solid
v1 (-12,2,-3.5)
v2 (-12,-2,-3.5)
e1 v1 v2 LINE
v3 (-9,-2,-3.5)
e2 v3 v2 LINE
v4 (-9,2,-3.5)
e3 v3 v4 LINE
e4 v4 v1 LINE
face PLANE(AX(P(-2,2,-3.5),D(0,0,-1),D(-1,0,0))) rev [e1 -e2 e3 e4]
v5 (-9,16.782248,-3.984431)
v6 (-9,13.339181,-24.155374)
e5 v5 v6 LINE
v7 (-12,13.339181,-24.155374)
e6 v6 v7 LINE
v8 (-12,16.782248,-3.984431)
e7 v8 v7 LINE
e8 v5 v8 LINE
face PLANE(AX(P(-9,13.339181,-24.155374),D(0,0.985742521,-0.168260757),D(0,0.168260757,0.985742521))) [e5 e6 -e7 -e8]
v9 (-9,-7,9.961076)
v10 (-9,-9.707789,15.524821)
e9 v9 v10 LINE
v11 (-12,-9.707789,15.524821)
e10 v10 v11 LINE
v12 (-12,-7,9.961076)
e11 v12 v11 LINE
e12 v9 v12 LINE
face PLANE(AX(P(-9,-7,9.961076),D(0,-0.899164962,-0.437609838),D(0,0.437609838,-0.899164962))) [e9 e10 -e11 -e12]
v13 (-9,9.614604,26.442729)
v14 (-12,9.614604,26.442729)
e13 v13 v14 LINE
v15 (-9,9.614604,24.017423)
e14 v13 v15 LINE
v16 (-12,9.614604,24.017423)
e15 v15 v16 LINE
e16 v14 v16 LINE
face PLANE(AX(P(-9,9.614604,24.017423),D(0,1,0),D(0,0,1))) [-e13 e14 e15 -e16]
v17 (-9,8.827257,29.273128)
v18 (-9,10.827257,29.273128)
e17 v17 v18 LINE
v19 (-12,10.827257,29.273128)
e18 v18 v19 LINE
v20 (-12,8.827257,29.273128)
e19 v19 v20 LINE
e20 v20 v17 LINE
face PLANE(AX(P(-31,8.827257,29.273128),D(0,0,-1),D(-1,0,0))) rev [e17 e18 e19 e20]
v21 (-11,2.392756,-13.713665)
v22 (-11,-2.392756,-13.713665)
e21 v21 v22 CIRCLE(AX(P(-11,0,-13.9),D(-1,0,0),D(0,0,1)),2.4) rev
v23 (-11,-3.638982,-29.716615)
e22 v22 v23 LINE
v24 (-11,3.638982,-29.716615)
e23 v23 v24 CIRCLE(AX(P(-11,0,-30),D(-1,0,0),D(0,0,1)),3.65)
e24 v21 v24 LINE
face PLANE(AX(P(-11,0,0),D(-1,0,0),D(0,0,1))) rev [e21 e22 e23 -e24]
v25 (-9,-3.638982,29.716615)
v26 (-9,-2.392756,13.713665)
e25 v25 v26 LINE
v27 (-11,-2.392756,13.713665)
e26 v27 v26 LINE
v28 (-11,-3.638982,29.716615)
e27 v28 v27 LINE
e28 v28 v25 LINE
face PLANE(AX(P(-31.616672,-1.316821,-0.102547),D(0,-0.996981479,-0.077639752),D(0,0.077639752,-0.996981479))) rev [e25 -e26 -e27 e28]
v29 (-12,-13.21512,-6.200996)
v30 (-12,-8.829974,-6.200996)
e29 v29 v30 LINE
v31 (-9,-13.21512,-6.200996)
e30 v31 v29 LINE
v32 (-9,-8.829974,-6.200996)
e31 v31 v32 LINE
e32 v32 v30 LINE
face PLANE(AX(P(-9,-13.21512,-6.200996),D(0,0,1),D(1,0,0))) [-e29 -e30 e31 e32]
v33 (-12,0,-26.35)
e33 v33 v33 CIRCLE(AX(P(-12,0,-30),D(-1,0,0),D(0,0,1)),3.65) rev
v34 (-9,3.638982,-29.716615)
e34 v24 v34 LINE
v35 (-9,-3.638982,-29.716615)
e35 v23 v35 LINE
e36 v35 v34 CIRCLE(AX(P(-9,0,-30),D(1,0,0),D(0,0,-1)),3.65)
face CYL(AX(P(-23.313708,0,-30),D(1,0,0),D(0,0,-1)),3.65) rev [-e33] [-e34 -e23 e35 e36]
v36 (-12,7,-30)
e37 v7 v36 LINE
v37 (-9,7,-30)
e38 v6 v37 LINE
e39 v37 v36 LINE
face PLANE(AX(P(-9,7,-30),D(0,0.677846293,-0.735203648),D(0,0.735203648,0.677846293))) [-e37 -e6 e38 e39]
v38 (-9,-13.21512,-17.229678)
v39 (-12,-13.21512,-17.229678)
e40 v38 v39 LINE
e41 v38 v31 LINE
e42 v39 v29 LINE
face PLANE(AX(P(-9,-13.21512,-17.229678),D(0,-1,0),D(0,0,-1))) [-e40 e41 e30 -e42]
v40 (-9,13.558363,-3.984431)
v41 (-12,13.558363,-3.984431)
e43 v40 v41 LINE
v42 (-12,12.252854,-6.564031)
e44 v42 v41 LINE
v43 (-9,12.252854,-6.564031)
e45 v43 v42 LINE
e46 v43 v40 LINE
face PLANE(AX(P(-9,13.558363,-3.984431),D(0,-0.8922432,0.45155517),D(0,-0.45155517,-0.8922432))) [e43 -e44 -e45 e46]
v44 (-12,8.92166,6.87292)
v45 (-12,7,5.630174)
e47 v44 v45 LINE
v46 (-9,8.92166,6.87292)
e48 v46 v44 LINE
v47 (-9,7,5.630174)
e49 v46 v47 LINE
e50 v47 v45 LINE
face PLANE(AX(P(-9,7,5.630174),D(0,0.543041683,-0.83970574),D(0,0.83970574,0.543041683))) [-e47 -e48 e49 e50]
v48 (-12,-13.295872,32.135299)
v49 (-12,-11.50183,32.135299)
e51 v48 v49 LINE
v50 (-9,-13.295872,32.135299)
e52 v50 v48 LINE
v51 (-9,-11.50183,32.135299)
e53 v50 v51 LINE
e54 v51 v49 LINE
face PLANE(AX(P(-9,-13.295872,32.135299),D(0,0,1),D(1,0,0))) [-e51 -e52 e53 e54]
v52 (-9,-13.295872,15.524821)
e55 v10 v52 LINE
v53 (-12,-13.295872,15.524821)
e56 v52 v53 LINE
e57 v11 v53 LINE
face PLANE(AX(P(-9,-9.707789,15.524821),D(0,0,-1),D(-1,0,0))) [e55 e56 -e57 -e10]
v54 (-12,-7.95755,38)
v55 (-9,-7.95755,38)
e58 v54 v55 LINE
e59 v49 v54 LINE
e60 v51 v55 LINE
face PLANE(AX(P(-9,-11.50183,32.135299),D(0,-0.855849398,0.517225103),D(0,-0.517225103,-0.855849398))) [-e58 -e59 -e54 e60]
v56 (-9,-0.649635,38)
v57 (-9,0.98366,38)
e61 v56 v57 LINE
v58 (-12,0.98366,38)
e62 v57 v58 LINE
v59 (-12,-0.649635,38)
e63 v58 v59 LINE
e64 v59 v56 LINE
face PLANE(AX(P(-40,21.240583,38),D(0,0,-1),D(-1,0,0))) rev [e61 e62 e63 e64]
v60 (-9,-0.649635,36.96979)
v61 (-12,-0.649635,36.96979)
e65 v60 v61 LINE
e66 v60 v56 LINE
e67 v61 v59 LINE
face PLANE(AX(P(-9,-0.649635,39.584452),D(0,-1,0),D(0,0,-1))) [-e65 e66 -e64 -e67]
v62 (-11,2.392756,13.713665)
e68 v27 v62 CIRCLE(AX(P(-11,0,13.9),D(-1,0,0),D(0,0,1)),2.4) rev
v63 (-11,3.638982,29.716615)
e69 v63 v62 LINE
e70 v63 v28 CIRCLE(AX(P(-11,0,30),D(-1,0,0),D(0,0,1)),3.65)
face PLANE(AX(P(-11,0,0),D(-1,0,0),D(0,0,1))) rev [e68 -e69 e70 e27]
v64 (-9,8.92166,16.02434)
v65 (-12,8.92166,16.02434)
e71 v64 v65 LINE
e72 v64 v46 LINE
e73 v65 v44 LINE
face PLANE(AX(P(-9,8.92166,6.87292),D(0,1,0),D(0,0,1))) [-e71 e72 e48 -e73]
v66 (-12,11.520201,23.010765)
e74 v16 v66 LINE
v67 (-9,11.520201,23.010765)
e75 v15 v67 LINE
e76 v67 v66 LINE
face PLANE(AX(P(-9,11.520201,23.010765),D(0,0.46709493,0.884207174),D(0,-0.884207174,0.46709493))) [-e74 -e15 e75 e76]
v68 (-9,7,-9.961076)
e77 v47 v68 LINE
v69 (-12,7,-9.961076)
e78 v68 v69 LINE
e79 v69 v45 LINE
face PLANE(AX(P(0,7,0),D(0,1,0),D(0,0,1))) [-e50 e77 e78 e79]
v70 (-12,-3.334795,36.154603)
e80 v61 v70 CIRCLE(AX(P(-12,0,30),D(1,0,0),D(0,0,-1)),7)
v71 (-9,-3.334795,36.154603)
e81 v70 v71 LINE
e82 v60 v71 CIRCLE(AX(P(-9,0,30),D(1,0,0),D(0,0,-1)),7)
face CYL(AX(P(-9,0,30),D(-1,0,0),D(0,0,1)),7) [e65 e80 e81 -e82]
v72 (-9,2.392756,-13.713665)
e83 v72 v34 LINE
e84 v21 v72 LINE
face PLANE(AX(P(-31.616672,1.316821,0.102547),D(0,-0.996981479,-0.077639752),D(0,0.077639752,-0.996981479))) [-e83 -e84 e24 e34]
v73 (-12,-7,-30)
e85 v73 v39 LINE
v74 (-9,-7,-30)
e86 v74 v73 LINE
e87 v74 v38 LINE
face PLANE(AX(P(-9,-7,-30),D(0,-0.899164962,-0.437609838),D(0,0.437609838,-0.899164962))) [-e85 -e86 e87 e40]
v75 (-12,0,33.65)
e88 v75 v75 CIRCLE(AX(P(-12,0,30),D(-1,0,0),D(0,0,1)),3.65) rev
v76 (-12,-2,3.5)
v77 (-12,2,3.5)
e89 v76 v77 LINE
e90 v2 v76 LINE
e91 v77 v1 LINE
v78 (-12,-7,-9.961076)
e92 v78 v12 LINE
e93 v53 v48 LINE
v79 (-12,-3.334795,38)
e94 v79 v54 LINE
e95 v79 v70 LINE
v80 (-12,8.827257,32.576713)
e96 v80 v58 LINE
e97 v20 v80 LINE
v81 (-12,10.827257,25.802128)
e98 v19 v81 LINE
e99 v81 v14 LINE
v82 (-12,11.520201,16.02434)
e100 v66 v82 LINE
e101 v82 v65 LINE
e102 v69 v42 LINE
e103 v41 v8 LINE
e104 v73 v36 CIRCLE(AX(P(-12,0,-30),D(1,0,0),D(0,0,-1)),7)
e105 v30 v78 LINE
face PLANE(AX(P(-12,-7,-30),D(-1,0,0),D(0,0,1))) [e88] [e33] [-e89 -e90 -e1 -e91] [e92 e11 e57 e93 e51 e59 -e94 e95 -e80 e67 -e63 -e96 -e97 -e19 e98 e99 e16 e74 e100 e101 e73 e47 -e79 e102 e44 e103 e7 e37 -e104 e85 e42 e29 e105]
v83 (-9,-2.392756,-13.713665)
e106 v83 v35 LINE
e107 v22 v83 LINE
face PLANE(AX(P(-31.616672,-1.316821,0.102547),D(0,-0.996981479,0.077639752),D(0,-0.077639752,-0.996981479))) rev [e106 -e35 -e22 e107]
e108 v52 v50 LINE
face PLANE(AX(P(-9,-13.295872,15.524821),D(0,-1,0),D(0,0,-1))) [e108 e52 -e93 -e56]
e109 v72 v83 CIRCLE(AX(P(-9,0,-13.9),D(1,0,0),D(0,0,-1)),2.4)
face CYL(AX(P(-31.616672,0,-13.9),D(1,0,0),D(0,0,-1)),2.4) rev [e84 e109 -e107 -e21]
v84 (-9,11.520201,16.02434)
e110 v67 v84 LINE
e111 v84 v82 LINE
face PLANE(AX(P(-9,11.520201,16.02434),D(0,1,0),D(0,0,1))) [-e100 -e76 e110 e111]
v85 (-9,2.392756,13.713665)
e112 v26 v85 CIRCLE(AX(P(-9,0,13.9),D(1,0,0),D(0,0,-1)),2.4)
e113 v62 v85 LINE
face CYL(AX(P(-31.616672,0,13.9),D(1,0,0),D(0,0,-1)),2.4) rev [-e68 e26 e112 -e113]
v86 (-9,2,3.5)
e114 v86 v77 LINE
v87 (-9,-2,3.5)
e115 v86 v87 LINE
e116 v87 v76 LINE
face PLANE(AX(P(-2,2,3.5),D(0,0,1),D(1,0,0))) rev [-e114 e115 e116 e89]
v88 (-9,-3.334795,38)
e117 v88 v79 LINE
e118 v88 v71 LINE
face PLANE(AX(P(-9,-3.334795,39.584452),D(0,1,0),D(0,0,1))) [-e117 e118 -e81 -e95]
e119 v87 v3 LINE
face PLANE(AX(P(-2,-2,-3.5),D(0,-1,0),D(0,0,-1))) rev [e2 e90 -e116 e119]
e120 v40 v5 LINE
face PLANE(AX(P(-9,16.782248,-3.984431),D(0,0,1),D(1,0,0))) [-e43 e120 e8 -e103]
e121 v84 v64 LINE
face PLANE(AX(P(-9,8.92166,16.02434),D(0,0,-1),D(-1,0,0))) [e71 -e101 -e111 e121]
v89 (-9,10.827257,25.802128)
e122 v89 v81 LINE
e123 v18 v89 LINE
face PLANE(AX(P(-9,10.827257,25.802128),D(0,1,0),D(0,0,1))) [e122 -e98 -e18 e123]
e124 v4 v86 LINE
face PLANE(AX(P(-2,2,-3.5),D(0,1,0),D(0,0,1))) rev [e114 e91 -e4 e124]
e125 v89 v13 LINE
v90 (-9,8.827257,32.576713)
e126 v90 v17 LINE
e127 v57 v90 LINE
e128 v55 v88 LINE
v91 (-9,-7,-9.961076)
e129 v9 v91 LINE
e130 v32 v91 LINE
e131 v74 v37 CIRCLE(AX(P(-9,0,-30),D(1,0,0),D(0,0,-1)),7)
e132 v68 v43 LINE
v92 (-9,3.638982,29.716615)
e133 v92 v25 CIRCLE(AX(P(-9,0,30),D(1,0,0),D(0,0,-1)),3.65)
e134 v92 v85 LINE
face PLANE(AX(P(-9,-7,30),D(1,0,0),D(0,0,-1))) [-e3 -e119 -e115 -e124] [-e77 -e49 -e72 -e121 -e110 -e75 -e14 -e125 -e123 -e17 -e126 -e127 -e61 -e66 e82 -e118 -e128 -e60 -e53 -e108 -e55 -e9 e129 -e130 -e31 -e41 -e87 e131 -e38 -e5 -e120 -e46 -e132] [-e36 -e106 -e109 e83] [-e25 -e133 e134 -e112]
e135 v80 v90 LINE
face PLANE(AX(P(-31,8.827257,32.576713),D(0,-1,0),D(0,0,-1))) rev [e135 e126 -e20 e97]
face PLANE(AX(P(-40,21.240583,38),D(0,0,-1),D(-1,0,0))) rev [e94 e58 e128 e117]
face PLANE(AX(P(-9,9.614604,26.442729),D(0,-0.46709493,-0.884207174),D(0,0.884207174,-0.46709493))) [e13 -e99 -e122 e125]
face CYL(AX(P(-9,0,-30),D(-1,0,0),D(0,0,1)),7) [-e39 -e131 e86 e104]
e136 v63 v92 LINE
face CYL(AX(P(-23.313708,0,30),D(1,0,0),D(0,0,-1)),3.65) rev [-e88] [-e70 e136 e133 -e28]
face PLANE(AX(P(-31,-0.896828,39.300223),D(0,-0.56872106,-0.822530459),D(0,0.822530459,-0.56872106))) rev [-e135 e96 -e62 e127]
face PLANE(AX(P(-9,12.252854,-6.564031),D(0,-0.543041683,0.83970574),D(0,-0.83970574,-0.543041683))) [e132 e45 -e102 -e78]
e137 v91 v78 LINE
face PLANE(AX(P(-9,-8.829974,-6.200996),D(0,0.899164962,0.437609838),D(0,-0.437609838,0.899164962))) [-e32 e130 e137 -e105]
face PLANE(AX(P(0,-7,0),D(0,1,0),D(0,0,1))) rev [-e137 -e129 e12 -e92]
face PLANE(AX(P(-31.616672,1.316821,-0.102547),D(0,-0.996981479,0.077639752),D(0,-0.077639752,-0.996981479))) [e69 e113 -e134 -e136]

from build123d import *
from build123d.topology import SkipClean

# Parameters (mm, degrees)
BOSS_EXTRUDE1_DEPTH      = 7
BOSS_EXTRUDE1_DEPTH_BACK = 7
SKETCH3_R                = 7
BOSS_EXTRUDE2_DEPTH      = 3
CUT_EXTRUDE1_DEPTH       = 23
CUT_EXTRUDE1_DEPTH_BACK  = 23
SKETCH4_R                = 4
BOSS_EXTRUDE3_DEPTH      = 3
CUT_EXTRUDE2_DEPTH       = 20
CUT_EXTRUDE2_DEPTH_BACK  = 30
SKETCH6_W                = 36.146068324
SKETCH6_H                = 79.881394618
SKETCH7_W                = 6
SKETCH7_H                = 2
BOSS_EXTRUDE4_DEPTH      = 25
SKETCH8_R                = 1.5
CUT_EXTRUDE3_DEPTH       = 25
SKETCH9_W                = 6
SKETCH9_H                = 2
BOSS_EXTRUDE5_DEPTH      = 11
SKETCH10_R               = 4
SKETCH10_R_2             = 3.65
BOSS_EXTRUDE7_DEPTH      = 3
SKETCH11_R               = 2.4
CUT_EXTRUDE4_DEPTH       = 3
BOSS_EXTRUDE9_START      = -1
SKETCH13_W               = 69.204545587
SKETCH13_H               = 9.322892152
SKETCH13_R               = 3.65
BOSS_EXTRUDE9_DEPTH      = 1
SKETCH14_W               = 11.115756027
SKETCH14_H               = 43.925164946
CUT_EXTRUDE5_DEPTH       = 31
CUT_EXTRUDE6_DEPTH       = 22
SKETCH16_W               = 30.440127373
SKETCH16_H               = 8.446463946
CUT_EXTRUDE7_DEPTH       = 10
SKETCH17_W               = 7
SKETCH17_H               = 4
CUT_EXTRUDE8_DEPTH       = 10


with BuildPart() as part:
    # Sketch2 → Boss-Extrude1 (new, two sides: drawn at the far end of the back side and taken through both)
    with BuildSketch(Plane(origin=(0, 0, 0), x_dir=(1, 0, 0), z_dir=(0, 1, 0)).offset(-BOSS_EXTRUDE1_DEPTH_BACK)):
        Polygon((12, 30), (12, -30), (9, -30), (9, -1.5), (-9, -1.5), (-9, -30), (-12, -30), (-12, 30), (-9, 30), (-9, 1.5), (9, 1.5), (9, 30), align=None)
    extrude(amount=BOSS_EXTRUDE1_DEPTH + BOSS_EXTRUDE1_DEPTH_BACK)

    # Sketch3 → Boss-Extrude2 (add)
    with BuildSketch(Plane(origin=(12, 0, 0), x_dir=(0, 0, -1), z_dir=(1, 0, 0))):
        with Locations((-30, 0)):
            Circle(SKETCH3_R)
        with Locations((30, 0)):
            Circle(SKETCH3_R)
    boss_extrude2 = extrude(amount=-BOSS_EXTRUDE2_DEPTH)

    # Mirror1: Boss-Extrude2 across plane
    add(boss_extrude2.mirror(Plane.ZY))

    # Sketch4 → Cut-Extrude1 (cut, two sides: drawn at the far end of the back side and taken through both)
    with BuildSketch(Plane.ZY.offset(-CUT_EXTRUDE1_DEPTH_BACK)):
        with Locations(Location((-30, 0, 0), (0, 0, 180))):
            Circle(SKETCH4_R)
        with Locations(Location((30, 0, 0), (0, 0, 180))):
            Circle(SKETCH4_R)
    extrude(amount=CUT_EXTRUDE1_DEPTH + CUT_EXTRUDE1_DEPTH_BACK, mode=Mode.SUBTRACT)

    # Sketch5 → Boss-Extrude3 (add)
    with BuildSketch(Plane.ZY.offset(12)):
        Polygon((-30, 7), (-24.155374342, 13.339180653), (-3.984430585, 16.782248387), (-3.984430585, 13.558363221), (-6.564031008, 12.252853794), (-9.961076462, 7), align=None)
        Polygon((5.630173652, 7), (6.872920148, 8.921659787), (16.024340395, 8.921659787), (16.024340395, 11.520201473), (23.010764714, 11.520201473), (24.017423371, 9.614604237), (26.442728945, 9.614604237), (25.802127981, 10.827257024), (33.625376893, 10.827257024), (39.584451678, 2.208760433), (39.584451678, -0.649635421), (35.450408088, -0.649635421), (35.450408088, 3.248177107), (30.561687085, 6.409736158), (5.630173652, 6.409736158), align=None)
        Polygon((-30, -7), (-17.229678236, -13.21512033), (-6.200995871, -13.21512033), (-6.200995871, -8.829973728), (-9.961076462, -7), align=None)
        Polygon((9.961076462, -7), (15.524820582, -9.707789187), (15.524820582, -13.295871625), (32.135298846, -13.295871625), (32.135298846, -11.501830406), (39.584451678, -7), (39.584451678, -3.334795163), (35.450408088, -3.334795163), (31.744983073, -5.574136385), (9.961076462, -5.574136385), align=None)
    boss_extrude3 = extrude(amount=-BOSS_EXTRUDE3_DEPTH)

    # Mirror2: Boss-Extrude3 across plane
    add(boss_extrude3.mirror(Plane.ZY))

    # Sketch6 → Cut-Extrude2 (cut, two sides: drawn at the far end of the back side and taken through both)
    with BuildSketch(Plane(origin=(0, 7, 0), x_dir=(1, 0, 0), z_dir=(0, 1, 0)).offset(-CUT_EXTRUDE2_DEPTH_BACK)):
        with Locations((9.073034162, -2.940697309)):
            Rectangle(SKETCH6_W, SKETCH6_H)
    extrude(amount=CUT_EXTRUDE2_DEPTH + CUT_EXTRUDE2_DEPTH_BACK, mode=Mode.SUBTRACT)

    # Sketch7 → Boss-Extrude4 (add)
    with BuildSketch(Plane.ZY.offset(12)):
        with Locations((0, -2)):
            Rectangle(SKETCH7_W, SKETCH7_H)
    extrude(amount=BOSS_EXTRUDE4_DEPTH)

    # Sketch8 → Cut-Extrude3 (cut)
    with BuildSketch(Plane(origin=(0, -1, 0), x_dir=(1, 0, 0), z_dir=(0, 1, 0))):
        with Locations(Location((-34, 0, 0), (0, 0, 270))):
            Circle(SKETCH8_R)
        with Locations(Location((-26, 0, 0), (0, 0, 270))):
            Circle(SKETCH8_R)
    extrude(amount=-CUT_EXTRUDE3_DEPTH, mode=Mode.SUBTRACT)

    # Sketch9 → Boss-Extrude5 (add)
    with BuildSketch(Plane.ZY.offset(12)):
        Rectangle(SKETCH9_W, SKETCH9_H)
    extrude(amount=BOSS_EXTRUDE5_DEPTH)

    # Sketch10 → Boss-Extrude7 (add)
    # profile 1 of 2: a face of its own
    with BuildSketch(Plane(origin=(-9, 0, 0), x_dir=(0, 0, -1), z_dir=(1, 0, 0))):
        with Locations((-30, 0)):
            Circle(SKETCH10_R)
        with Locations((-30, 0)):
            Circle(SKETCH10_R_2, mode=Mode.SUBTRACT)
    # profile 2 of 2: a face of its own
    with BuildSketch(Plane(origin=(-9, 0, 0), x_dir=(0, 0, -1), z_dir=(1, 0, 0))):
        with Locations((30, 0)):
            Circle(SKETCH10_R)
        with Locations((30, 0)):
            Circle(SKETCH10_R_2, mode=Mode.SUBTRACT)
    extrude(amount=-BOSS_EXTRUDE7_DEPTH)

    # Sketch11 → Cut-Extrude4 (cut)
    with BuildSketch(Plane(origin=(-9, 0, 0), x_dir=(0, 0, -1), z_dir=(1, 0, 0))):
        with BuildLine():
            Line((-13.713664596, 2.392755549), (-29.716614907, 3.638982397))
            ThreePointArc((-29.716614907, 3.638982397), (-27.320741186, 2.478723907), (-26.35, 0))
            ThreePointArc((-26.35, 0), (-27.320741186, -2.478723907), (-29.716614907, -3.638982397))
            Line((-29.716614907, -3.638982397), (-13.713664596, -2.392755549))
            ThreePointArc((-13.713664596, -2.392755549), (-16.3, 0), (-13.713664596, 2.392755549))
        make_face()
        with Locations((-13.9, 0)):
            Circle(SKETCH11_R)
        with BuildLine():
            Line((29.716614907, 3.638982397), (13.713664596, 2.392755549))
            ThreePointArc((13.713664596, 2.392755549), (15.529845856, 1.761704426), (16.3, 0))
            ThreePointArc((16.3, 0), (15.529845856, -1.761704426), (13.713664596, -2.392755549))
            Line((13.713664596, -2.392755549), (29.716614907, -3.638982397))
            ThreePointArc((29.716614907, -3.638982397), (26.35, 0), (29.716614907, 3.638982397))
        make_face()
        with Locations((13.9, 0)):
            Circle(SKETCH11_R)
    extrude(amount=-CUT_EXTRUDE4_DEPTH, mode=Mode.SUBTRACT)

    # Sketch13 → Boss-Extrude9 (add)
    with SkipClean():  # the faces are left unmerged after this step: merging them gives an invalid solid
        with BuildSketch(Plane.ZY.offset(12).offset(BOSS_EXTRUDE9_START)):
            with Locations((0.485437096, -0.184140285)):
                Rectangle(SKETCH13_W, SKETCH13_H)
            with Locations(Location((-30, 0, 0), (0, 0, 85.547088609))):
                Circle(SKETCH13_R, mode=Mode.SUBTRACT)
            with Locations(Location((30, 0, 0), (0, 0, 265.547088609))):
                Circle(SKETCH13_R, mode=Mode.SUBTRACT)
        extrude(amount=BOSS_EXTRUDE9_DEPTH)
    add(part.part.scale(1), mode=Mode.REPLACE)  # the faces are merged on a copy

    # Sketch14 → Cut-Extrude5 (cut)
    with BuildSketch(Plane(origin=(-9, 0, 0), x_dir=(0, 0, -1), z_dir=(1, 0, 0))):
        with Locations((-43.557878014, -0.721999448)):
            Rectangle(SKETCH14_W, SKETCH14_H)
    extrude(amount=-CUT_EXTRUDE5_DEPTH, mode=Mode.SUBTRACT)

    # Sketch15 → Cut-Extrude6 (cut)
    with BuildSketch(Plane(origin=(-9, 0, 0), x_dir=(0, 0, -1), z_dir=(1, 0, 0))):
        Polygon((-39.300223418, -0.896828093), (-32.576713138, 8.827257024), (-29.273128497, 8.827257024), (-29.273128497, 11.015866037), (-39.300223418, 11.015866037), align=None)
    extrude(amount=-CUT_EXTRUDE6_DEPTH, mode=Mode.SUBTRACT)

    # Sketch16 → Cut-Extrude7 (cut)
    with BuildSketch(Plane(origin=(0, 1, 0), x_dir=(1, 0, 0), z_dir=(0, 1, 0))):
        with Locations((-27.220063687, 1.223231973)):
            Rectangle(SKETCH16_W, SKETCH16_H)
    extrude(amount=-CUT_EXTRUDE7_DEPTH, mode=Mode.SUBTRACT)

    # Sketch17 → Cut-Extrude8 (cut)
    with BuildSketch(Plane.ZY.offset(12)):
        Rectangle(SKETCH17_W, SKETCH17_H)
    extrude(amount=-CUT_EXTRUDE8_DEPTH, mode=Mode.SUBTRACT)


solid = part.part
